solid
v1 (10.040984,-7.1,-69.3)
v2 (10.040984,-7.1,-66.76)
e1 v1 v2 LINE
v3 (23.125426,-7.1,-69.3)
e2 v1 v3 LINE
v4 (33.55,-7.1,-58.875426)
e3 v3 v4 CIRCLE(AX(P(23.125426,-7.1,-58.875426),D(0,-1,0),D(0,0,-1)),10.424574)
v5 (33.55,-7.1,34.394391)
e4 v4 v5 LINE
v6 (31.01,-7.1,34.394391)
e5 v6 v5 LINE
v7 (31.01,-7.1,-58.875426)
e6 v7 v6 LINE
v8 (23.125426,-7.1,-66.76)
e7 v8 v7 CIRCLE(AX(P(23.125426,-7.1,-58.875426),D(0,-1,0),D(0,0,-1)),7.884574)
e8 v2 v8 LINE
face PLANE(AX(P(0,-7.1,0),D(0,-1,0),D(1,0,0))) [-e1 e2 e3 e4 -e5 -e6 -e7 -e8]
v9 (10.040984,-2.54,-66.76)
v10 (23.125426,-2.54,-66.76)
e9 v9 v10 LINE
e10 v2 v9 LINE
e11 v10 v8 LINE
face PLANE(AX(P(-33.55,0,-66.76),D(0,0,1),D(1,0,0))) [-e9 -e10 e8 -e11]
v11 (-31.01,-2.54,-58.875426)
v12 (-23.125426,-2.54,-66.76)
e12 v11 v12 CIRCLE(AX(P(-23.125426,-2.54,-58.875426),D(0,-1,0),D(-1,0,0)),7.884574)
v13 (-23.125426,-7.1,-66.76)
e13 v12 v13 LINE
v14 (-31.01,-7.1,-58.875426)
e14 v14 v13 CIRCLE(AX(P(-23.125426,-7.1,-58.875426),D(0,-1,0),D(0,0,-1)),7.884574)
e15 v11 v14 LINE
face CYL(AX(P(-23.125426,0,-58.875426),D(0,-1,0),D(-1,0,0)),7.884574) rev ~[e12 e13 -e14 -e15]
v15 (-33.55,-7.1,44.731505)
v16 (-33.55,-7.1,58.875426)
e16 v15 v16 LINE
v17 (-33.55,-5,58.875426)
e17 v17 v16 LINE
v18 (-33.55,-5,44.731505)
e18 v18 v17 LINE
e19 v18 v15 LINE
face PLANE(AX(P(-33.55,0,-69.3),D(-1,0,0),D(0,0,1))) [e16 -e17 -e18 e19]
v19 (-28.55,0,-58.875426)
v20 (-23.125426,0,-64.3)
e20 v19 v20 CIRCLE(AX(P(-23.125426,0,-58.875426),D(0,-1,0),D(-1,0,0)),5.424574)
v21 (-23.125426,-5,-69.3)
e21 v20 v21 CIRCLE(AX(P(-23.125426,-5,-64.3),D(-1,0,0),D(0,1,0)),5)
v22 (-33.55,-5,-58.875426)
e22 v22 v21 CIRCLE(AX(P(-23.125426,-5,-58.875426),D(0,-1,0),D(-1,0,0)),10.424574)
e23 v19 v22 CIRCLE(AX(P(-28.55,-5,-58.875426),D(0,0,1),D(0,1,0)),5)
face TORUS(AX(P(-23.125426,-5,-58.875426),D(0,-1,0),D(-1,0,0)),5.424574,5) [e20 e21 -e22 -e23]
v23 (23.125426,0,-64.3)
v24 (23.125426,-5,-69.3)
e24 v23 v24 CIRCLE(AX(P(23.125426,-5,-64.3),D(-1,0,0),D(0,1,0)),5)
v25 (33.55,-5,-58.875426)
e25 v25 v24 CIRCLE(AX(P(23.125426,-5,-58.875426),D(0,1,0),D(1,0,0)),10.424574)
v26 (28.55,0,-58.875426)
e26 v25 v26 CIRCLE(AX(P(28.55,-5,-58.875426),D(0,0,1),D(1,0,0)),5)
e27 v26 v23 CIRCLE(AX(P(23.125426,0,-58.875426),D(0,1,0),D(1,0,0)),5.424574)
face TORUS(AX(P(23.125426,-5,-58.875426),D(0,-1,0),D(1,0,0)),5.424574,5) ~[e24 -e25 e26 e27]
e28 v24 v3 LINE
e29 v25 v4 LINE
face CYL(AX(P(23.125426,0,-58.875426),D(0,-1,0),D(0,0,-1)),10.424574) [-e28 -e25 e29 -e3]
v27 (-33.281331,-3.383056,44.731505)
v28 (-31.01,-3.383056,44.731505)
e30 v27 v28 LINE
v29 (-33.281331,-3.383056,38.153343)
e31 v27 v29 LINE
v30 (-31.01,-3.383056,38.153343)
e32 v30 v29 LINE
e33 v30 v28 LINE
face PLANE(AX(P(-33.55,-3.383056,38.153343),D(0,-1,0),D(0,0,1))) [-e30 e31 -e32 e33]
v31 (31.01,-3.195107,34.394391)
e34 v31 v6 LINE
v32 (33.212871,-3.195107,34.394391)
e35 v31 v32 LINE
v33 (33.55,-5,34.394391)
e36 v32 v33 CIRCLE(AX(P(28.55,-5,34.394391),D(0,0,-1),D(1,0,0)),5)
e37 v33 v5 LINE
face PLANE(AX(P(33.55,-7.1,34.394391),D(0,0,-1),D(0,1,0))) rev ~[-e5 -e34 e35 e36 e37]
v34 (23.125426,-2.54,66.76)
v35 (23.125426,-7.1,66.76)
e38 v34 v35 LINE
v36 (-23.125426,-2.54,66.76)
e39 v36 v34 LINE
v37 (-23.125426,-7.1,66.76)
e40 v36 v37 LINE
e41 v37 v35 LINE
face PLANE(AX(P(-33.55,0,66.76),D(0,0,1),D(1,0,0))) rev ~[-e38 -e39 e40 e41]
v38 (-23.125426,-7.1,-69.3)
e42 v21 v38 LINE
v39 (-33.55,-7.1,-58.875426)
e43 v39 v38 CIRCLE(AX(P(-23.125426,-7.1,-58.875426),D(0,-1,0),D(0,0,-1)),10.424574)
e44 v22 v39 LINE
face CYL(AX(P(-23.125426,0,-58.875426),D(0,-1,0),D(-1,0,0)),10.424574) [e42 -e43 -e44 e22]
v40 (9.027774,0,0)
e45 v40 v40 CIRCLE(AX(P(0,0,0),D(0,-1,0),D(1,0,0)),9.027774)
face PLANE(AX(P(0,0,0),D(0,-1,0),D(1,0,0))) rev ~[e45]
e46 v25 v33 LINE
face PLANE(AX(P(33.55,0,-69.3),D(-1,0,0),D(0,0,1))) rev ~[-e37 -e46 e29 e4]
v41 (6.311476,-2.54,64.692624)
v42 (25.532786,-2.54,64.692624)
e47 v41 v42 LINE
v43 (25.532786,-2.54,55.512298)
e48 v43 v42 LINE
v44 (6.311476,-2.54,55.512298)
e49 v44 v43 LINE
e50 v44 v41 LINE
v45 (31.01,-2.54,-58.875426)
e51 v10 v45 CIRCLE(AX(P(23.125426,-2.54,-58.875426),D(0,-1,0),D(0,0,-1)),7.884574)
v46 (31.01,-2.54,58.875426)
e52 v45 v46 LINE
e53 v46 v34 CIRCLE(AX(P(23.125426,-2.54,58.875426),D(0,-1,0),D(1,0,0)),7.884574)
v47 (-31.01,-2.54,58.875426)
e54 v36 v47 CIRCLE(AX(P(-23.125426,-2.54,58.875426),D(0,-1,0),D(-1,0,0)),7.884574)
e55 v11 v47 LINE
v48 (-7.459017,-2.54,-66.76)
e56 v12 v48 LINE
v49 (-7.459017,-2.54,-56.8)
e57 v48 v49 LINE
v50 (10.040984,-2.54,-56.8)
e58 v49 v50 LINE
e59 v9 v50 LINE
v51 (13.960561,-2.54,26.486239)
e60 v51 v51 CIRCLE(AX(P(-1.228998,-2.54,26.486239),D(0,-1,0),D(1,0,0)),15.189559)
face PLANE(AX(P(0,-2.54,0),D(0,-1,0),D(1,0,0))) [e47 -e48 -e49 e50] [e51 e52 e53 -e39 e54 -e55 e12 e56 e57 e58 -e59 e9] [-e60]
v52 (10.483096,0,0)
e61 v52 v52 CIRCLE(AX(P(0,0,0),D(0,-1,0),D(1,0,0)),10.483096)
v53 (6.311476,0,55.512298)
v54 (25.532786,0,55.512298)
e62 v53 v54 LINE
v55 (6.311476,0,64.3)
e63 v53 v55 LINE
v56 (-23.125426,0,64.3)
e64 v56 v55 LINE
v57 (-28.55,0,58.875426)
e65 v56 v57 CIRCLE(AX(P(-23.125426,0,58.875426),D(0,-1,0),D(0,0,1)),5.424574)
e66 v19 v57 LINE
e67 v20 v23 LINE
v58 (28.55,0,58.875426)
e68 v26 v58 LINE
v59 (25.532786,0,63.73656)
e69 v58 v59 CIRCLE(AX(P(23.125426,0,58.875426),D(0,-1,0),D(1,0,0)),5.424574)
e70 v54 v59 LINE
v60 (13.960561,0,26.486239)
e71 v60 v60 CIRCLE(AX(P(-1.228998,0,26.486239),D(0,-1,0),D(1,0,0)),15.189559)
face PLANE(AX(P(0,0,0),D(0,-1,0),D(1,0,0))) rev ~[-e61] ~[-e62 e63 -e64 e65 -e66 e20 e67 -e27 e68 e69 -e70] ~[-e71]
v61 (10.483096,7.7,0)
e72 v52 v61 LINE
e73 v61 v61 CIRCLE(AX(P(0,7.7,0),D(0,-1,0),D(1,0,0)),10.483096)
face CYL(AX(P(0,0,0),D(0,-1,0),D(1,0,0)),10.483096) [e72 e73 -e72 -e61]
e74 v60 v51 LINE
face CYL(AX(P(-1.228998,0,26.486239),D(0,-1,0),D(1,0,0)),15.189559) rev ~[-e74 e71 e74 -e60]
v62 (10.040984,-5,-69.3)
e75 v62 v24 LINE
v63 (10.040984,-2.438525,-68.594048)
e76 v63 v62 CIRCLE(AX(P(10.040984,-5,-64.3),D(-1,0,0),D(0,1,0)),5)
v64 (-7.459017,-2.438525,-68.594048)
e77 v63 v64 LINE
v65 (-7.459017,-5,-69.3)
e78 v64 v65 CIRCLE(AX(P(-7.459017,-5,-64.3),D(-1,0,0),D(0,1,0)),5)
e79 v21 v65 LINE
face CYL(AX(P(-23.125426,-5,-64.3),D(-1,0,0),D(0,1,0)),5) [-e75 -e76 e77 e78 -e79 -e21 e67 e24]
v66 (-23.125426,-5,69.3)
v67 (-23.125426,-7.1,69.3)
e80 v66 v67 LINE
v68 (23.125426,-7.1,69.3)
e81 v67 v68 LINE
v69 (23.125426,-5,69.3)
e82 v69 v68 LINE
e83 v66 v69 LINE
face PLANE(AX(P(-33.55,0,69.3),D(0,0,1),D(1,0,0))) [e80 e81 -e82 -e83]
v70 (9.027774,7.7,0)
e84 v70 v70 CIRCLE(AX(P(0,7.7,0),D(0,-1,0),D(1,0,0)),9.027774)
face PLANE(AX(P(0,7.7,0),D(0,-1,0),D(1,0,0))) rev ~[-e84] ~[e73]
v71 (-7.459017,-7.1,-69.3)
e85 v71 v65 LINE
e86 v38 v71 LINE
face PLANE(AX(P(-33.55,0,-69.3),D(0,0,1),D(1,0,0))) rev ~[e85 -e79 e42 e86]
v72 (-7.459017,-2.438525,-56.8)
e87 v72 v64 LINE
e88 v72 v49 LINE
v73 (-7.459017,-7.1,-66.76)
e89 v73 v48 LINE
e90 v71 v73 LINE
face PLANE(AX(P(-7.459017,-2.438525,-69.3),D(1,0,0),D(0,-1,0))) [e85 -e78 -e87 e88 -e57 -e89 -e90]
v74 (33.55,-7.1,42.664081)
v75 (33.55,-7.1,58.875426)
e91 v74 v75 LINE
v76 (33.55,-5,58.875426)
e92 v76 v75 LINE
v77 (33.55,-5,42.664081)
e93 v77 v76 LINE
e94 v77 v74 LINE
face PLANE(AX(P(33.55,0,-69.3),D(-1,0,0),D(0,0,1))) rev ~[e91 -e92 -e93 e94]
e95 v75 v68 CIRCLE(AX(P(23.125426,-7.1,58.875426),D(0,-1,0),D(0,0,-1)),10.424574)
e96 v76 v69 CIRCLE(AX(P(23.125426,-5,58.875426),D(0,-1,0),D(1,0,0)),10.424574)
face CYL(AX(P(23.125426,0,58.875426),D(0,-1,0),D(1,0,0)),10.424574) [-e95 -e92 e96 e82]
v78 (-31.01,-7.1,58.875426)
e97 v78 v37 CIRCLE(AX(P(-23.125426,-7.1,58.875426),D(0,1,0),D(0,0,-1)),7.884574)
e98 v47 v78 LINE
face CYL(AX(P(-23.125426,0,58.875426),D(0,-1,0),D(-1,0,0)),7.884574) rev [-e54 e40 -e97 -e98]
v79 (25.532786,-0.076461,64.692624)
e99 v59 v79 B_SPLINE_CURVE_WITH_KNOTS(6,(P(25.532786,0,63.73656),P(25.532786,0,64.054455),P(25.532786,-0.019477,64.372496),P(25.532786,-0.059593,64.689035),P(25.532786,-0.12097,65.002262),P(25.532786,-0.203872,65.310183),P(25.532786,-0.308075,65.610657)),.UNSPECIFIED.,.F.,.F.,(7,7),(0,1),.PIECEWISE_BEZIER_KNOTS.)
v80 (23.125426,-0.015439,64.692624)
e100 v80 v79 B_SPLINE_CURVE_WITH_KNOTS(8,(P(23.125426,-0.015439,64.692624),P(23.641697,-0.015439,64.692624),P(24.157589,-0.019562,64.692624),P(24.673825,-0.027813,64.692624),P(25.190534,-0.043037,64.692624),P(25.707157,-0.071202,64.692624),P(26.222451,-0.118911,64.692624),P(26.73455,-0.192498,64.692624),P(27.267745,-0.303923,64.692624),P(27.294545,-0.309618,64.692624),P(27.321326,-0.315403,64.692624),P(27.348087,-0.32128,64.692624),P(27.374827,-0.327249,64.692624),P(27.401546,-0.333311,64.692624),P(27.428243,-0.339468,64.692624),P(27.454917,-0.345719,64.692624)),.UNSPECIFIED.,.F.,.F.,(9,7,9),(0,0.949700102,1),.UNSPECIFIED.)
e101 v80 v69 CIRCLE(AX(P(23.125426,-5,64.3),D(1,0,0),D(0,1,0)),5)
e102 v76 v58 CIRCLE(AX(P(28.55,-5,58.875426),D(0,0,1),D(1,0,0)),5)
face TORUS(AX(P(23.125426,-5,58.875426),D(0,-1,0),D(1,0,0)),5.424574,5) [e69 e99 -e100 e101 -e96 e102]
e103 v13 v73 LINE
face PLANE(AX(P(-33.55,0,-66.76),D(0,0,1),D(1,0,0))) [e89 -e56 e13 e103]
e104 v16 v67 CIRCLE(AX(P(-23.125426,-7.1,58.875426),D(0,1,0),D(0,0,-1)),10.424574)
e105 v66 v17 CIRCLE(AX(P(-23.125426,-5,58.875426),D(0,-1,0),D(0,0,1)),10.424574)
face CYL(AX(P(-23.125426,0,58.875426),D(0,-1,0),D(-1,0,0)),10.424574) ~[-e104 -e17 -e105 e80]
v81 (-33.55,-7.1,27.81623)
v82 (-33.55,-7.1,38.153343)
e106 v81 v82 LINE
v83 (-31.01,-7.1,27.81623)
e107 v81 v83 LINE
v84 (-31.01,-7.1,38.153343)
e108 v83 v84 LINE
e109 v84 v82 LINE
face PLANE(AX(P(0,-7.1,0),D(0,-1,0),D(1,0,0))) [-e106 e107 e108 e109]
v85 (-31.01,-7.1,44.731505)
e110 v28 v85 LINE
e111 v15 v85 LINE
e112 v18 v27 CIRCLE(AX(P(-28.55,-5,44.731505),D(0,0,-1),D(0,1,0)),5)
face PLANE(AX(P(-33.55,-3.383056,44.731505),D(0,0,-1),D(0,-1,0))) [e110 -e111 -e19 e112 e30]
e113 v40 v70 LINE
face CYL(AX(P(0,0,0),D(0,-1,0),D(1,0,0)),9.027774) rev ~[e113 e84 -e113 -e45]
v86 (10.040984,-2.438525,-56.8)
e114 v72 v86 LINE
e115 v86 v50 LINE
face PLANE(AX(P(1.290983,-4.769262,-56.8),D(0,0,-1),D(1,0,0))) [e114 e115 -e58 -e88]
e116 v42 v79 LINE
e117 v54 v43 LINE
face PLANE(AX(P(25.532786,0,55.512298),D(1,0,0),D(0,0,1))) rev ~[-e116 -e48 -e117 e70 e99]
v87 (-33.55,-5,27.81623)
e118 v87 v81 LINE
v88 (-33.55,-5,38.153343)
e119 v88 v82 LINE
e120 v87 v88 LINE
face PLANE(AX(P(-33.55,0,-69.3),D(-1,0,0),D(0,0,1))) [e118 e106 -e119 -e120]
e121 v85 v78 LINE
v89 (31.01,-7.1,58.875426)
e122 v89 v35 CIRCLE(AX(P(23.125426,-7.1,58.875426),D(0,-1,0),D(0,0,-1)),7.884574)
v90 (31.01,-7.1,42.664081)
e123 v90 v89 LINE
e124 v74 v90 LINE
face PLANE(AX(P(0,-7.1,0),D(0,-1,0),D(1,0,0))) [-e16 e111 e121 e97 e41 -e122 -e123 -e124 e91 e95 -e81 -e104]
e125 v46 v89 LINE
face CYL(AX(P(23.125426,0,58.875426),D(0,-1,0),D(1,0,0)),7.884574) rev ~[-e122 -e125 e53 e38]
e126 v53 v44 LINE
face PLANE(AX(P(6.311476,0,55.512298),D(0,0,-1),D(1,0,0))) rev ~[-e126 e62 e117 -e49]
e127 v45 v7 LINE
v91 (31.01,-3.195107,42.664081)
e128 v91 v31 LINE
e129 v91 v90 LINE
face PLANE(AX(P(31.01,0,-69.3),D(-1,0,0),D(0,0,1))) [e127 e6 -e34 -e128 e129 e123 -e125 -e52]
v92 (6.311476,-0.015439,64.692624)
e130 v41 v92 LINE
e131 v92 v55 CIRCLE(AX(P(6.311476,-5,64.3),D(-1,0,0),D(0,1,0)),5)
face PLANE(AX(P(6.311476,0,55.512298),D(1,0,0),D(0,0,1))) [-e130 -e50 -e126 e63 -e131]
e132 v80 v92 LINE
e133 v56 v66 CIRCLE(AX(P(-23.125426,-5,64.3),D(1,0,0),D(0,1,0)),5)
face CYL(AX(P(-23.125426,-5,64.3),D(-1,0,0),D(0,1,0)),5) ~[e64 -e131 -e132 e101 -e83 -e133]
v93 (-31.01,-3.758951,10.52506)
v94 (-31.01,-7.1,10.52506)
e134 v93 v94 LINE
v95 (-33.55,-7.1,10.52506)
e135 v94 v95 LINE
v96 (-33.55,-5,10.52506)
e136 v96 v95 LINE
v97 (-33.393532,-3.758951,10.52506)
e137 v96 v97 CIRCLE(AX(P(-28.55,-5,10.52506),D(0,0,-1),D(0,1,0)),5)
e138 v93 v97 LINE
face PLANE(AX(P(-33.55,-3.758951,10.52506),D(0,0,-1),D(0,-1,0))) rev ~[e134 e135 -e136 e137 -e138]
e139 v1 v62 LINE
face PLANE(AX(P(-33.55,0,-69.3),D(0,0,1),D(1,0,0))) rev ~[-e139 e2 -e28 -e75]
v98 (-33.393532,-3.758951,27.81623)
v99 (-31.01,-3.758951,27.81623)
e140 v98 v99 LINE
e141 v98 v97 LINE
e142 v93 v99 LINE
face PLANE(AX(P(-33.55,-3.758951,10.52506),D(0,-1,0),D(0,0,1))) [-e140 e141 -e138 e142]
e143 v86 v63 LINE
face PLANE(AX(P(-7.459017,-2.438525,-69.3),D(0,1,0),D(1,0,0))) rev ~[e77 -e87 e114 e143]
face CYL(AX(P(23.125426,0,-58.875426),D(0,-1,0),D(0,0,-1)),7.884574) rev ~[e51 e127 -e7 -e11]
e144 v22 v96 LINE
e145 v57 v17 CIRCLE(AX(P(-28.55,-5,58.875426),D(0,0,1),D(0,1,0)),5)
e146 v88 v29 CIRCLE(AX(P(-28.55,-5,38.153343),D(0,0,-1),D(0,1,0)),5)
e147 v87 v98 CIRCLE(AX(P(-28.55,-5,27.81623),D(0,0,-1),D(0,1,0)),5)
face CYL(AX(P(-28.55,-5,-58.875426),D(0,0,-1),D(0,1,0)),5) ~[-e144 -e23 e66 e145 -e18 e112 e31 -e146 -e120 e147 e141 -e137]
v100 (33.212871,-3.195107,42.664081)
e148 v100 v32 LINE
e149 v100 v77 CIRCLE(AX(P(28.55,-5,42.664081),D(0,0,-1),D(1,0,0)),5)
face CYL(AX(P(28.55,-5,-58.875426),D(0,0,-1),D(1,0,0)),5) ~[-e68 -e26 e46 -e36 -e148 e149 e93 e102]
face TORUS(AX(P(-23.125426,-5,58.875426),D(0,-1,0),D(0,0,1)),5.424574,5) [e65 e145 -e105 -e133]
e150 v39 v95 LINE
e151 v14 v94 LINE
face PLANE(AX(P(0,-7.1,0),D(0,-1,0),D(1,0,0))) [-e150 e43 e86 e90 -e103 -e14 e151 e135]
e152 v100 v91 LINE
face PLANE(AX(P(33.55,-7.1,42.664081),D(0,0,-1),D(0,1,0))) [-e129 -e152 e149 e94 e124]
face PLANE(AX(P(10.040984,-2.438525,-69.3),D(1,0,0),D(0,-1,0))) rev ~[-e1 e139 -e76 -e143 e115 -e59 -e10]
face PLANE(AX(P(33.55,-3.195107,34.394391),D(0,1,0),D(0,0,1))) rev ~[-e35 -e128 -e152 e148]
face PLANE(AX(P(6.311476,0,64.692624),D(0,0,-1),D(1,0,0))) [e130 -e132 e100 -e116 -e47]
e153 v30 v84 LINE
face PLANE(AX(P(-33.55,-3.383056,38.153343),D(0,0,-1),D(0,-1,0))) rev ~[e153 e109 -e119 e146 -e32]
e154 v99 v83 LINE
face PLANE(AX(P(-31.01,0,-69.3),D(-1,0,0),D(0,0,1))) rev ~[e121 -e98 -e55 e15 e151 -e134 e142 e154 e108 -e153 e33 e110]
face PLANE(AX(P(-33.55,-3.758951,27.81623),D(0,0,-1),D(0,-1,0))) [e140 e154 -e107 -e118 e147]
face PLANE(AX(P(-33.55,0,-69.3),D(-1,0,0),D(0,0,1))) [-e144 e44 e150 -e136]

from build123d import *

# Parameters (mm, degrees)
F0_W          = 67.1
F0_H          = 138.6
F1_DEPTH      = 7.1
F2_R          = 10.4245741623
F3_T          = -2.54
F4_W          = 19.2213095725
F4_H          = 9.1803260148
F5_DEPTH      = 12.5
F6_W          = 17.5000010058
F6_H          = 4.661475262
F7_DEPTH      = 12.5
F8_W          = 3.0759498477
F8_H          = 14.1388773918
F9_DEPTH      = 12.5
F10_W         = 3.7169439722
F10_H         = 6.5781623125
F11_DEPTH     = 12.5
F12_W         = 3.3410489097
F12_H         = 17.2911705449
F13_DEPTH     = 12.5
F14_W         = 3.904892784
F14_H         = 8.2696899772
F15_DEPTH     = 12.5
F16_T1_DEPTH  = 117.7508516753
F16_T3_DEPTH  = 46.2508516753
F16_T6_ANGLE  = 90
F16_T8_ANGLE  = 90
F16_T10_ANGLE = 90
F16_T12_ANGLE = 90
F17_R         = 15.1895589548
F18_DEPTH     = 12.5
F19_R         = 10.4830955048
F19_R_2       = 9.0277735867
F20_DEPTH     = 7.7


# Not quite as in the source:
# - a fillet or chamfer that OpenCascade refuses, or shapes differently, is made with other operations: its cross-section is extruded or revolved along the edge and cut away or added


with BuildPart() as f1:
    # F0 (on Front) → F1 (new body)
    with BuildSketch(Plane.XZ):
        Rectangle(F0_W, F0_H)
    extrude(amount=F1_DEPTH)

    # F2
    f2_edges = [f1.edges().sort_by_distance(p)[0] for p in [
        (33.55, -3.55, 69.3),
        (-33.55, -3.55, 69.3),
        (-33.55, -3.55, -69.3),
        (33.55, -3.55, -69.3),
    ]]
    fillet(f2_edges, radius=F2_R)

    # F3
    f3_openings = [f1.faces().sort_by_distance(p)[0] for p in [
        (0, -7.1, 0),
    ]]
    offset(amount=F3_T, openings=f3_openings)

    # F4 (on Front) → F5 (cut, symmetric)
    with BuildSketch(Plane.XZ):
        with Locations((15.9221310169, 60.1024609059)):
            Rectangle(F4_W, F4_H)
    extrude(amount=F5_DEPTH, both=True, mode=Mode.SUBTRACT)

    # F6 (on face) → F7 (cut, symmetric)
    with BuildSketch(Plane(origin=(0, 0, -69.3), x_dir=(1, 0, 0), z_dir=(0, 0, -1))):
        with Locations((1.2909830548, 4.769262369)):
            Rectangle(F6_W, F6_H)
    extrude(amount=F7_DEPTH, both=True, mode=Mode.SUBTRACT)

    # F8 (on Front) → F9 (cut, symmetric)
    with BuildSketch(Plane.XZ):
        with Locations((35.5030968785, 36.7480814457)):
            Rectangle(F8_W, F8_H)
    extrude(amount=F9_DEPTH, both=True, mode=Mode.SUBTRACT)

    # F10 (on face) → F11 (cut, symmetric)
    with BuildSketch(Plane(origin=(-33.55, 0, 0), x_dir=(0, -1, 0), z_dir=(-1, 0, 0))):
        with Locations((5.2415280139, 41.4424240589)):
            Rectangle(F10_W, F10_H)
    extrude(amount=F11_DEPTH, both=True, mode=Mode.SUBTRACT)

    # F12 (on face) → F13 (cut, symmetric)
    with BuildSketch(Plane(origin=(-33.55, 0, 0), x_dir=(0, -1, 0), z_dir=(-1, 0, 0))):
        with Locations((5.4294755451, 19.1706451587)):
            Rectangle(F12_W, F12_H)
    extrude(amount=F13_DEPTH, both=True, mode=Mode.SUBTRACT)

    # F14 (on face) → F15 (cut, symmetric)
    with BuildSketch(Plane.YZ.offset(33.55)):
        with Locations((-5.147553608, 38.5292358696)):
            Rectangle(F14_W, F14_H)
    extrude(amount=F15_DEPTH, both=True, mode=Mode.SUBTRACT)

    # F16: fillet of radius 5 on 1 edges, made by hand

    # F16_s2 → F16_t1 (cut)
    with BuildSketch(Plane.XY.offset(-58.8754258377)):
        with BuildLine():
            ThreePointArc((33.55, -5), (32.0855339059, -1.4644660941), (28.55, 0))
            Line((28.55, 0), (33.55, 0))
            Line((33.55, 0), (33.55, -5))
        make_face()
        with BuildLine():
            ThreePointArc((-28.55, 0), (-32.0855339059, -1.4644660941), (-33.55, -5))
            Line((-33.55, -5), (-33.55, 0))
            Line((-33.55, 0), (-28.55, 0))
        make_face()
    extrude(amount=F16_T1_DEPTH, mode=Mode.SUBTRACT)

    # F16_s4 → F16_t3 (cut)
    with BuildSketch(Plane.YZ.offset(-23.1254258377)):
        with BuildLine():
            ThreePointArc((0, 64.3), (-1.4644660941, 67.8355339059), (-5, 69.3))
            Line((-5, 69.3), (0, 69.3))
            Line((0, 69.3), (0, 64.3))
        make_face()
        with BuildLine():
            ThreePointArc((0, -64.3), (-1.4644660941, -67.8355339059), (-5, -69.3))
            Line((-5, -69.3), (0, -69.3))
            Line((0, -69.3), (0, -64.3))
        make_face()
    extrude(amount=F16_T3_DEPTH, mode=Mode.SUBTRACT)

    # F16_s5 → F16_t6 (revolve, cut)
    with BuildSketch(Plane.XY.offset(-58.8754258377)):
        with BuildLine():
            ThreePointArc((28.55, 0), (32.0855339059, -1.4644660941), (33.55, -5))
            Line((33.55, -5), (33.55, 0))
            Line((33.55, 0), (28.55, 0))
        make_face()
    revolve(axis=Axis((23.1254258377, 0, -58.8754258377), (0, 1, 0)), revolution_arc=F16_T6_ANGLE, mode=Mode.SUBTRACT)

    # F16_s7 → F16_t8 (revolve, cut)
    with BuildSketch(Plane.XY.offset(58.8754258377)):
        with BuildLine():
            ThreePointArc((28.55, 0), (32.0855339059, -1.4644660941), (33.55, -5))
            Line((33.55, -5), (33.55, 0))
            Line((33.55, 0), (28.55, 0))
        make_face()
    revolve(axis=Axis((23.1254258377, 0, 58.8754258377), (0, -1, 0)), revolution_arc=F16_T8_ANGLE, mode=Mode.SUBTRACT)

    # F16_s9 → F16_t10 (revolve, cut)
    with BuildSketch(Plane.YZ.offset(-23.1254258377)):
        with BuildLine():
            ThreePointArc((0, 64.3), (-1.4644660941, 67.8355339059), (-5, 69.3))
            Line((-5, 69.3), (0, 69.3))
            Line((0, 69.3), (0, 64.3))
        make_face()
    revolve(axis=Axis((-23.1254258377, 0, 58.8754258377), (0, -1, 0)), revolution_arc=F16_T10_ANGLE, mode=Mode.SUBTRACT)

    # F16_s11 → F16_t12 (revolve, cut)
    with BuildSketch(Plane.XY.offset(-58.8754258377)):
        with BuildLine():
            ThreePointArc((-28.55, 0), (-32.0855339059, -1.4644660941), (-33.55, -5))
            Line((-33.55, -5), (-33.55, 0))
            Line((-33.55, 0), (-28.55, 0))
        make_face()
    revolve(axis=Axis((-23.1254258377, 0, -58.8754258377), (0, -1, 0)), revolution_arc=F16_T12_ANGLE, mode=Mode.SUBTRACT)

    # F17 (on Front) → F18 (cut, symmetric)
    with BuildSketch(Plane.XZ):
        with Locations((-1.2289978711, 26.4862392154)):
            Circle(F17_R)
    extrude(amount=F18_DEPTH, both=True, mode=Mode.SUBTRACT)

    # F19 (on Front) → F20 (join)
    with BuildSketch(Plane.XZ):
        Circle(F19_R)
        Circle(F19_R_2, mode=Mode.SUBTRACT)
    extrude(amount=-F20_DEPTH)


solid = f1.part
